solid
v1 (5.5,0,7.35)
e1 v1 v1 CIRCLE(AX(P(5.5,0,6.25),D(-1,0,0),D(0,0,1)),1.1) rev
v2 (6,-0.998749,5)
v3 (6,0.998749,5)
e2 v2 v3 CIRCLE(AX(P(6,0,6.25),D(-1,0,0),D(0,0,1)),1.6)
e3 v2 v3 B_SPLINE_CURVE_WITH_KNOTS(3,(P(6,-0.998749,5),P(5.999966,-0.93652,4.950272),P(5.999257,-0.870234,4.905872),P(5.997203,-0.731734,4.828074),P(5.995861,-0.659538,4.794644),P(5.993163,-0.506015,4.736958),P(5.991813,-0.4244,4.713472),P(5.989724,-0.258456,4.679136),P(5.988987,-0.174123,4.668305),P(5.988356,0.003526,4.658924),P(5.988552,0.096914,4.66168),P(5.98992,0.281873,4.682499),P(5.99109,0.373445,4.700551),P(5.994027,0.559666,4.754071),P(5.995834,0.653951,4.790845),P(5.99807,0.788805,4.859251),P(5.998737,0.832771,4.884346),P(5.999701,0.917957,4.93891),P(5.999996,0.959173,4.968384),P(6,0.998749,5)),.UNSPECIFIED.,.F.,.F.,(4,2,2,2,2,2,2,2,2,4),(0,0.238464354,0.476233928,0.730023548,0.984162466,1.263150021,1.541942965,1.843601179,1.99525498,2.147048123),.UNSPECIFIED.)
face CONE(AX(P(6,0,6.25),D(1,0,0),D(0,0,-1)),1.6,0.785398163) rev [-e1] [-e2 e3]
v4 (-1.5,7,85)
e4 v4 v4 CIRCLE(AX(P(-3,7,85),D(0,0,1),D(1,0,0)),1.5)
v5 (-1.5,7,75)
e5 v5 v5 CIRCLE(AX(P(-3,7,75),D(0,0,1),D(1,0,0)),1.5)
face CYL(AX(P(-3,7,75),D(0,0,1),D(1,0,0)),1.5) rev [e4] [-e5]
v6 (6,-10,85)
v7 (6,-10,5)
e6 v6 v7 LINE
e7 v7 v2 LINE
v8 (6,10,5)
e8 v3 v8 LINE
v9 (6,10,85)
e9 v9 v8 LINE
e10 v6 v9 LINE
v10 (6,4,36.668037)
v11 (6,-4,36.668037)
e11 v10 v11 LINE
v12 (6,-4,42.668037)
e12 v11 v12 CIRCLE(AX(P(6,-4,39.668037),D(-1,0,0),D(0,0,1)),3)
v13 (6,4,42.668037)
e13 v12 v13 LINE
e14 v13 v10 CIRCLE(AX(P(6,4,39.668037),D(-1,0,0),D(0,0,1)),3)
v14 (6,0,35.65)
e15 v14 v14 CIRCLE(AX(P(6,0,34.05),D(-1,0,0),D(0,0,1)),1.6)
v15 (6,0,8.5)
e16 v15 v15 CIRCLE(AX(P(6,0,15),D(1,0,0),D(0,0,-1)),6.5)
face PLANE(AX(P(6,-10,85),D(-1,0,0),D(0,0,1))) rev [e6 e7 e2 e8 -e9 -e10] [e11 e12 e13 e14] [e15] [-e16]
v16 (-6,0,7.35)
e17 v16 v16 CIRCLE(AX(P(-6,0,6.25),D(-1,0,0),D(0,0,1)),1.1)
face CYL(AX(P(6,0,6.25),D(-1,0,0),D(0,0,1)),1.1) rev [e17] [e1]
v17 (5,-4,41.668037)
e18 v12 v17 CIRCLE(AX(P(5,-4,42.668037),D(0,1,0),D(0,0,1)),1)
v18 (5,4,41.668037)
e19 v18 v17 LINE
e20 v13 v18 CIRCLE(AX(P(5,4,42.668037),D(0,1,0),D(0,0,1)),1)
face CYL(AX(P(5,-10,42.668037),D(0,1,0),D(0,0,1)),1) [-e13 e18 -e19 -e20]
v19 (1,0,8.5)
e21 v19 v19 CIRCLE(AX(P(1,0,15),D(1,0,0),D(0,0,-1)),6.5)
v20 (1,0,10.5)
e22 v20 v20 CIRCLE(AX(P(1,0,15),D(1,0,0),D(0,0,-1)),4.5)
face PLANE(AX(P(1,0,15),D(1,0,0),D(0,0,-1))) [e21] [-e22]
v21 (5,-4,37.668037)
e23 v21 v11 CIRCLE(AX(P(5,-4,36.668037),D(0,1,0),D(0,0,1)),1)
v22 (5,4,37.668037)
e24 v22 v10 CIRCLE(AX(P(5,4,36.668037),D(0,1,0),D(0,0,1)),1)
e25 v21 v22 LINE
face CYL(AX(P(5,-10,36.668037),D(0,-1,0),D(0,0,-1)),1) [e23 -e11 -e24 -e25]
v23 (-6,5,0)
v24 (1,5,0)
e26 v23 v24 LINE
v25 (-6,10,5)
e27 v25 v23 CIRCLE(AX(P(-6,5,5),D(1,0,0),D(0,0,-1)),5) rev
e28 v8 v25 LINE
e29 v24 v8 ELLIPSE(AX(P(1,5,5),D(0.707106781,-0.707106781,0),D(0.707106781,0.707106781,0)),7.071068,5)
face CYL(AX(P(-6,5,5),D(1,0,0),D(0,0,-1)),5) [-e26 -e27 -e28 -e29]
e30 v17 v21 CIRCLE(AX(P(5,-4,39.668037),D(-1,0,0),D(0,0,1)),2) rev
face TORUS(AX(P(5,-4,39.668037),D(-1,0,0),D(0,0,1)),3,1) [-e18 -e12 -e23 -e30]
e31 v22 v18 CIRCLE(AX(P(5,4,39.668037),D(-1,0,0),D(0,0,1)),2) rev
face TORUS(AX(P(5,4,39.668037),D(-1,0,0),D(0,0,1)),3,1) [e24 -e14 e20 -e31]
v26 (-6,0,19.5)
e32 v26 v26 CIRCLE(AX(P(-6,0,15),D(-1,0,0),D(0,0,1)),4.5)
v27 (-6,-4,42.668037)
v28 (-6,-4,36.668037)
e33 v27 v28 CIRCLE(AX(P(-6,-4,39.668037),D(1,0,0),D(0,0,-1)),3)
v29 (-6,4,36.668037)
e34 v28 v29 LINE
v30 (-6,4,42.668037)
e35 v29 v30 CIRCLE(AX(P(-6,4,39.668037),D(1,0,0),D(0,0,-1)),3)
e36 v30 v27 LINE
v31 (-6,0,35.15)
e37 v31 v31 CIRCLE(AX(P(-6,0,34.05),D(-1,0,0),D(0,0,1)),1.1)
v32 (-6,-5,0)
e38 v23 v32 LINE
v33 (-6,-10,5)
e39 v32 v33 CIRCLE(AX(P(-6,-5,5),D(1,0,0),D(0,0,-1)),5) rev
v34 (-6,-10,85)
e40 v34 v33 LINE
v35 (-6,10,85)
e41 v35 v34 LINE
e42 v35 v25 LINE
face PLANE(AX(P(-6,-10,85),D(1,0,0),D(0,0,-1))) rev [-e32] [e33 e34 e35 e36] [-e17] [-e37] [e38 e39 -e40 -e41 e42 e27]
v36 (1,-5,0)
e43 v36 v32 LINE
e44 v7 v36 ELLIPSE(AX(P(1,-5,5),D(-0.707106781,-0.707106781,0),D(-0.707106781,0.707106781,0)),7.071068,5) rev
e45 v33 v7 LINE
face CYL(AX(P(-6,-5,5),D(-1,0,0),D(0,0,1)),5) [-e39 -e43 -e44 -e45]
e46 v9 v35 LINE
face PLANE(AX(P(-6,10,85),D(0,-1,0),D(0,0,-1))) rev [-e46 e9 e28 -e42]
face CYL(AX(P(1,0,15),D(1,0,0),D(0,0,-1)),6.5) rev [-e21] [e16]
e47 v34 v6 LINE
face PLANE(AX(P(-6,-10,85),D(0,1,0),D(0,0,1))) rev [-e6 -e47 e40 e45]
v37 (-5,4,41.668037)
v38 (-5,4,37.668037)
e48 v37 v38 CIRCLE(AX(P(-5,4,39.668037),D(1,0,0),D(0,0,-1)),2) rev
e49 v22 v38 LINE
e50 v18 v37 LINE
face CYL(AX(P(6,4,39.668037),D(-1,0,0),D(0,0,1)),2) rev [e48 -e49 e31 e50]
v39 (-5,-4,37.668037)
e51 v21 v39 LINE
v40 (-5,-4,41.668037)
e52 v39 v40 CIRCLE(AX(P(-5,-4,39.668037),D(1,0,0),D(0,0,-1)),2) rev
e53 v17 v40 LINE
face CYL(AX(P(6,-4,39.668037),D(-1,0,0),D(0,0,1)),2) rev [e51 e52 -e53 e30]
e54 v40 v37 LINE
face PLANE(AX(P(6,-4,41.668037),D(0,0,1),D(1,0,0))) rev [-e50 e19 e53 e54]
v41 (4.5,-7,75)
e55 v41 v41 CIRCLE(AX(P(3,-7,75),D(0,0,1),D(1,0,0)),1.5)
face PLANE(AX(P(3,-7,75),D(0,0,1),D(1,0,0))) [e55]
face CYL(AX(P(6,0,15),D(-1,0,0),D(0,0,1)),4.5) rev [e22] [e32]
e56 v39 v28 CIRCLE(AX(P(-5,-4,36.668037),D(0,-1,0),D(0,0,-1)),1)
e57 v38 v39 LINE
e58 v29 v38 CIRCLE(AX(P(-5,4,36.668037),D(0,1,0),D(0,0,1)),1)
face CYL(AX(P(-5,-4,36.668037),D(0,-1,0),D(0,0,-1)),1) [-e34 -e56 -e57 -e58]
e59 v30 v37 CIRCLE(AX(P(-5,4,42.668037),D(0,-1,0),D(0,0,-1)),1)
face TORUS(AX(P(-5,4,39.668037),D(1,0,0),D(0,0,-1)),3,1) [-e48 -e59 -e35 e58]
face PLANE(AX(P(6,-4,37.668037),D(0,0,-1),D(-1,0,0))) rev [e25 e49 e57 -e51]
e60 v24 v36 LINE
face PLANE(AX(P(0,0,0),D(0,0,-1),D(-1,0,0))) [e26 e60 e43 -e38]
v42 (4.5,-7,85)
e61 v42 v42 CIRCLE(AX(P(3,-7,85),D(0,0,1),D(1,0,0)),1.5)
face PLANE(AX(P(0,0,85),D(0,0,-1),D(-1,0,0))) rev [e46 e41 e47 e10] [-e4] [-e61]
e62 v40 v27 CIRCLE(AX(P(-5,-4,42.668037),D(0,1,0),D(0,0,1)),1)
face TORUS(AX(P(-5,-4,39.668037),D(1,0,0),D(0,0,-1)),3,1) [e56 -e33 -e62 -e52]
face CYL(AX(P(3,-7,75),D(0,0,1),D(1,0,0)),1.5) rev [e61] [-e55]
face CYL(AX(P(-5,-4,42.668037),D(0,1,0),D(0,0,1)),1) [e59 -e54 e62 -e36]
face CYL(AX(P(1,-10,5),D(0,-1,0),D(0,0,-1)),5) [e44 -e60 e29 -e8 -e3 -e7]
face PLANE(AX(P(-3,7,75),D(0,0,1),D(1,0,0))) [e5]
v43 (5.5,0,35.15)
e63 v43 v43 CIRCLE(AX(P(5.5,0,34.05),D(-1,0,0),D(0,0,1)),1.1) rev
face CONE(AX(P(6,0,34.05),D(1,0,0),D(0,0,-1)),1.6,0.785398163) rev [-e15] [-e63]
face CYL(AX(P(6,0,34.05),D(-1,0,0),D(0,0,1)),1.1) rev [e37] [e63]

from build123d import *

# Parameters (mm, degrees)
SZKIC1_W                    = 12
SZKIC1_H                    = 20
DODANIE_WYCI_GNI_CIE1_DEPTH = 85
SZKIC2_R                    = 1.5
WYTNIJ_WYCI_GNI_CIE1_DEPTH  = 10
SZKIC4_R                    = 6.5
WYTNIJ_WYCI_GNI_CIE2_DEPTH  = 5
SZKIC5_R                    = 4.5
WYTNIJ_WYCI_GNI_CIE3_DEPTH  = 87.423376467
SZKIC6_R                    = 1.1
WYTNIJ_WYCI_GNI_CIE4_DEPTH  = 87.423376467
SFAZOWANIE1_SIZE            = 0.5
SZKIC7_R                    = 1.1
WYTNIJ_WYCI_GNI_CIE5_DEPTH  = 87.423376467
SFAZOWANIE2_SIZE            = 0.5
ZAOKR_GLENIE1_R             = 5
WYTNIJ_WYCI_GNI_CIE6_DEPTH  = 87.423376493
ZAOKR_GLENIE2_R             = 1


with BuildPart() as part:
    # Szkic1 → Dodanie-wyciągnięcie1 (new body)
    with BuildSketch(Plane.XY):
        Rectangle(SZKIC1_W, SZKIC1_H)
    extrude(amount=DODANIE_WYCI_GNI_CIE1_DEPTH)

    # Szkic2 → Wytnij-wyciągnięcie1 (cut)
    with BuildSketch(Plane.XY.offset(85)):
        with Locations((-3, 7)):
            Circle(SZKIC2_R)
        with Locations((3, -7)):
            Circle(SZKIC2_R)
    extrude(amount=-WYTNIJ_WYCI_GNI_CIE1_DEPTH, mode=Mode.SUBTRACT)

    # Szkic4 → Wytnij-wyciągnięcie2 (cut)
    with BuildSketch(Plane(origin=(6, 0, 0), x_dir=(0, 0, -1), z_dir=(1, 0, 0))):
        with Locations((-15, 0)):
            Circle(SZKIC4_R)
    extrude(amount=-WYTNIJ_WYCI_GNI_CIE2_DEPTH, mode=Mode.SUBTRACT)

    # Szkic5 → Wytnij-wyciągnięcie3 (cut, through all)
    with BuildSketch(Plane.ZY.offset(6)):
        with Locations((15, 0)):
            Circle(SZKIC5_R)
    extrude(amount=-WYTNIJ_WYCI_GNI_CIE3_DEPTH, mode=Mode.SUBTRACT)

    # Szkic6 → Wytnij-wyciągnięcie4 (cut, through all)
    with BuildSketch(Plane.ZY.offset(6)):
        with Locations((34.05, 0)):
            Circle(SZKIC6_R)
    extrude(amount=-WYTNIJ_WYCI_GNI_CIE4_DEPTH, mode=Mode.SUBTRACT)

    # Sfazowanie1
    sfazowanie1_edges = [part.edges().sort_by_distance(p)[0] for p in [
        (6, 0, 32.95),
    ]]
    chamfer(sfazowanie1_edges, length=SFAZOWANIE1_SIZE)

    # Szkic7 → Wytnij-wyciągnięcie5 (cut, through all)
    with BuildSketch(Plane.ZY.offset(6)):
        with Locations((6.25, 0)):
            Circle(SZKIC7_R)
    extrude(amount=-WYTNIJ_WYCI_GNI_CIE5_DEPTH, mode=Mode.SUBTRACT)

    # Sfazowanie2
    sfazowanie2_edges = [part.edges().sort_by_distance(p)[0] for p in [
        (6, 0, 5.15),
    ]]
    chamfer(sfazowanie2_edges, length=SFAZOWANIE2_SIZE)

    # Zaokrąglenie1
    # the kernel refuses this fillet: 5 mm, written as the material it takes off along each edge
    with BuildSketch(Plane(origin=(-18.5, -10, 0), x_dir=(0, 0, 1), z_dir=(1, 0, 0))) as zaokr_glenie1_piece_1:
        with BuildLine():
            CenterArc((ZAOKR_GLENIE1_R, -ZAOKR_GLENIE1_R), ZAOKR_GLENIE1_R, 90, 90)
            Line((0, -ZAOKR_GLENIE1_R), (0, 0))
            Line((0, 0), (ZAOKR_GLENIE1_R, 0))
        make_face()
    extrude(amount=37, mode=Mode.SUBTRACT)
    with BuildSketch(Plane(origin=(18.5, 10, 0), x_dir=(0, -1, 0), z_dir=(-1, 0, 0))) as zaokr_glenie1_piece_2:
        with BuildLine():
            CenterArc((ZAOKR_GLENIE1_R, ZAOKR_GLENIE1_R), ZAOKR_GLENIE1_R, 180, 90)
            Line((0, ZAOKR_GLENIE1_R), (0, 0))
            Line((0, 0), (ZAOKR_GLENIE1_R, 0))
        make_face()
    extrude(amount=37, mode=Mode.SUBTRACT)
    with BuildSketch(Plane(origin=(6, -22.5, 0), x_dir=(0, 0, 1), z_dir=(0, 1, 0))) as zaokr_glenie1_piece_3:
        with BuildLine():
            CenterArc((ZAOKR_GLENIE1_R, -ZAOKR_GLENIE1_R), ZAOKR_GLENIE1_R, 90, 90)
            Line((0, -ZAOKR_GLENIE1_R), (0, 0))
            Line((0, 0), (ZAOKR_GLENIE1_R, 0))
        make_face()
    extrude(amount=45, mode=Mode.SUBTRACT)

    # Szkic8 → Wytnij-wyciągnięcie6 (cut, through all)
    with BuildSketch(Plane.ZY.offset(6)):
        with BuildLine():
            Line((37.668037351, -4), (37.668037351, 4))
            ThreePointArc((37.668037351, 4), (39.668037351, 6), (41.668037351, 4))
            Line((41.668037351, 4), (41.668037351, -4))
            ThreePointArc((41.668037351, -4), (39.668037351, -6), (37.668037351, -4))
        make_face()
    extrude(amount=-WYTNIJ_WYCI_GNI_CIE6_DEPTH, mode=Mode.SUBTRACT)

    # Zaokrąglenie2
    zaokr_glenie2_edges = [part.edges().sort_by_distance(p)[0] for p in [
        (6, -6, 39.668037351),
        (6, 0, 37.668037351),
        (6, 6, 39.668037351),
        (6, 0, 41.668037351),
        (-6, -6, 39.668037351),
        (-6, 0, 41.668037351),
        (-6, 6, 39.668037351),
        (-6, 0, 37.668037351),
    ]]
    fillet(zaokr_glenie2_edges, radius=ZAOKR_GLENIE2_R)


solid = part.part
